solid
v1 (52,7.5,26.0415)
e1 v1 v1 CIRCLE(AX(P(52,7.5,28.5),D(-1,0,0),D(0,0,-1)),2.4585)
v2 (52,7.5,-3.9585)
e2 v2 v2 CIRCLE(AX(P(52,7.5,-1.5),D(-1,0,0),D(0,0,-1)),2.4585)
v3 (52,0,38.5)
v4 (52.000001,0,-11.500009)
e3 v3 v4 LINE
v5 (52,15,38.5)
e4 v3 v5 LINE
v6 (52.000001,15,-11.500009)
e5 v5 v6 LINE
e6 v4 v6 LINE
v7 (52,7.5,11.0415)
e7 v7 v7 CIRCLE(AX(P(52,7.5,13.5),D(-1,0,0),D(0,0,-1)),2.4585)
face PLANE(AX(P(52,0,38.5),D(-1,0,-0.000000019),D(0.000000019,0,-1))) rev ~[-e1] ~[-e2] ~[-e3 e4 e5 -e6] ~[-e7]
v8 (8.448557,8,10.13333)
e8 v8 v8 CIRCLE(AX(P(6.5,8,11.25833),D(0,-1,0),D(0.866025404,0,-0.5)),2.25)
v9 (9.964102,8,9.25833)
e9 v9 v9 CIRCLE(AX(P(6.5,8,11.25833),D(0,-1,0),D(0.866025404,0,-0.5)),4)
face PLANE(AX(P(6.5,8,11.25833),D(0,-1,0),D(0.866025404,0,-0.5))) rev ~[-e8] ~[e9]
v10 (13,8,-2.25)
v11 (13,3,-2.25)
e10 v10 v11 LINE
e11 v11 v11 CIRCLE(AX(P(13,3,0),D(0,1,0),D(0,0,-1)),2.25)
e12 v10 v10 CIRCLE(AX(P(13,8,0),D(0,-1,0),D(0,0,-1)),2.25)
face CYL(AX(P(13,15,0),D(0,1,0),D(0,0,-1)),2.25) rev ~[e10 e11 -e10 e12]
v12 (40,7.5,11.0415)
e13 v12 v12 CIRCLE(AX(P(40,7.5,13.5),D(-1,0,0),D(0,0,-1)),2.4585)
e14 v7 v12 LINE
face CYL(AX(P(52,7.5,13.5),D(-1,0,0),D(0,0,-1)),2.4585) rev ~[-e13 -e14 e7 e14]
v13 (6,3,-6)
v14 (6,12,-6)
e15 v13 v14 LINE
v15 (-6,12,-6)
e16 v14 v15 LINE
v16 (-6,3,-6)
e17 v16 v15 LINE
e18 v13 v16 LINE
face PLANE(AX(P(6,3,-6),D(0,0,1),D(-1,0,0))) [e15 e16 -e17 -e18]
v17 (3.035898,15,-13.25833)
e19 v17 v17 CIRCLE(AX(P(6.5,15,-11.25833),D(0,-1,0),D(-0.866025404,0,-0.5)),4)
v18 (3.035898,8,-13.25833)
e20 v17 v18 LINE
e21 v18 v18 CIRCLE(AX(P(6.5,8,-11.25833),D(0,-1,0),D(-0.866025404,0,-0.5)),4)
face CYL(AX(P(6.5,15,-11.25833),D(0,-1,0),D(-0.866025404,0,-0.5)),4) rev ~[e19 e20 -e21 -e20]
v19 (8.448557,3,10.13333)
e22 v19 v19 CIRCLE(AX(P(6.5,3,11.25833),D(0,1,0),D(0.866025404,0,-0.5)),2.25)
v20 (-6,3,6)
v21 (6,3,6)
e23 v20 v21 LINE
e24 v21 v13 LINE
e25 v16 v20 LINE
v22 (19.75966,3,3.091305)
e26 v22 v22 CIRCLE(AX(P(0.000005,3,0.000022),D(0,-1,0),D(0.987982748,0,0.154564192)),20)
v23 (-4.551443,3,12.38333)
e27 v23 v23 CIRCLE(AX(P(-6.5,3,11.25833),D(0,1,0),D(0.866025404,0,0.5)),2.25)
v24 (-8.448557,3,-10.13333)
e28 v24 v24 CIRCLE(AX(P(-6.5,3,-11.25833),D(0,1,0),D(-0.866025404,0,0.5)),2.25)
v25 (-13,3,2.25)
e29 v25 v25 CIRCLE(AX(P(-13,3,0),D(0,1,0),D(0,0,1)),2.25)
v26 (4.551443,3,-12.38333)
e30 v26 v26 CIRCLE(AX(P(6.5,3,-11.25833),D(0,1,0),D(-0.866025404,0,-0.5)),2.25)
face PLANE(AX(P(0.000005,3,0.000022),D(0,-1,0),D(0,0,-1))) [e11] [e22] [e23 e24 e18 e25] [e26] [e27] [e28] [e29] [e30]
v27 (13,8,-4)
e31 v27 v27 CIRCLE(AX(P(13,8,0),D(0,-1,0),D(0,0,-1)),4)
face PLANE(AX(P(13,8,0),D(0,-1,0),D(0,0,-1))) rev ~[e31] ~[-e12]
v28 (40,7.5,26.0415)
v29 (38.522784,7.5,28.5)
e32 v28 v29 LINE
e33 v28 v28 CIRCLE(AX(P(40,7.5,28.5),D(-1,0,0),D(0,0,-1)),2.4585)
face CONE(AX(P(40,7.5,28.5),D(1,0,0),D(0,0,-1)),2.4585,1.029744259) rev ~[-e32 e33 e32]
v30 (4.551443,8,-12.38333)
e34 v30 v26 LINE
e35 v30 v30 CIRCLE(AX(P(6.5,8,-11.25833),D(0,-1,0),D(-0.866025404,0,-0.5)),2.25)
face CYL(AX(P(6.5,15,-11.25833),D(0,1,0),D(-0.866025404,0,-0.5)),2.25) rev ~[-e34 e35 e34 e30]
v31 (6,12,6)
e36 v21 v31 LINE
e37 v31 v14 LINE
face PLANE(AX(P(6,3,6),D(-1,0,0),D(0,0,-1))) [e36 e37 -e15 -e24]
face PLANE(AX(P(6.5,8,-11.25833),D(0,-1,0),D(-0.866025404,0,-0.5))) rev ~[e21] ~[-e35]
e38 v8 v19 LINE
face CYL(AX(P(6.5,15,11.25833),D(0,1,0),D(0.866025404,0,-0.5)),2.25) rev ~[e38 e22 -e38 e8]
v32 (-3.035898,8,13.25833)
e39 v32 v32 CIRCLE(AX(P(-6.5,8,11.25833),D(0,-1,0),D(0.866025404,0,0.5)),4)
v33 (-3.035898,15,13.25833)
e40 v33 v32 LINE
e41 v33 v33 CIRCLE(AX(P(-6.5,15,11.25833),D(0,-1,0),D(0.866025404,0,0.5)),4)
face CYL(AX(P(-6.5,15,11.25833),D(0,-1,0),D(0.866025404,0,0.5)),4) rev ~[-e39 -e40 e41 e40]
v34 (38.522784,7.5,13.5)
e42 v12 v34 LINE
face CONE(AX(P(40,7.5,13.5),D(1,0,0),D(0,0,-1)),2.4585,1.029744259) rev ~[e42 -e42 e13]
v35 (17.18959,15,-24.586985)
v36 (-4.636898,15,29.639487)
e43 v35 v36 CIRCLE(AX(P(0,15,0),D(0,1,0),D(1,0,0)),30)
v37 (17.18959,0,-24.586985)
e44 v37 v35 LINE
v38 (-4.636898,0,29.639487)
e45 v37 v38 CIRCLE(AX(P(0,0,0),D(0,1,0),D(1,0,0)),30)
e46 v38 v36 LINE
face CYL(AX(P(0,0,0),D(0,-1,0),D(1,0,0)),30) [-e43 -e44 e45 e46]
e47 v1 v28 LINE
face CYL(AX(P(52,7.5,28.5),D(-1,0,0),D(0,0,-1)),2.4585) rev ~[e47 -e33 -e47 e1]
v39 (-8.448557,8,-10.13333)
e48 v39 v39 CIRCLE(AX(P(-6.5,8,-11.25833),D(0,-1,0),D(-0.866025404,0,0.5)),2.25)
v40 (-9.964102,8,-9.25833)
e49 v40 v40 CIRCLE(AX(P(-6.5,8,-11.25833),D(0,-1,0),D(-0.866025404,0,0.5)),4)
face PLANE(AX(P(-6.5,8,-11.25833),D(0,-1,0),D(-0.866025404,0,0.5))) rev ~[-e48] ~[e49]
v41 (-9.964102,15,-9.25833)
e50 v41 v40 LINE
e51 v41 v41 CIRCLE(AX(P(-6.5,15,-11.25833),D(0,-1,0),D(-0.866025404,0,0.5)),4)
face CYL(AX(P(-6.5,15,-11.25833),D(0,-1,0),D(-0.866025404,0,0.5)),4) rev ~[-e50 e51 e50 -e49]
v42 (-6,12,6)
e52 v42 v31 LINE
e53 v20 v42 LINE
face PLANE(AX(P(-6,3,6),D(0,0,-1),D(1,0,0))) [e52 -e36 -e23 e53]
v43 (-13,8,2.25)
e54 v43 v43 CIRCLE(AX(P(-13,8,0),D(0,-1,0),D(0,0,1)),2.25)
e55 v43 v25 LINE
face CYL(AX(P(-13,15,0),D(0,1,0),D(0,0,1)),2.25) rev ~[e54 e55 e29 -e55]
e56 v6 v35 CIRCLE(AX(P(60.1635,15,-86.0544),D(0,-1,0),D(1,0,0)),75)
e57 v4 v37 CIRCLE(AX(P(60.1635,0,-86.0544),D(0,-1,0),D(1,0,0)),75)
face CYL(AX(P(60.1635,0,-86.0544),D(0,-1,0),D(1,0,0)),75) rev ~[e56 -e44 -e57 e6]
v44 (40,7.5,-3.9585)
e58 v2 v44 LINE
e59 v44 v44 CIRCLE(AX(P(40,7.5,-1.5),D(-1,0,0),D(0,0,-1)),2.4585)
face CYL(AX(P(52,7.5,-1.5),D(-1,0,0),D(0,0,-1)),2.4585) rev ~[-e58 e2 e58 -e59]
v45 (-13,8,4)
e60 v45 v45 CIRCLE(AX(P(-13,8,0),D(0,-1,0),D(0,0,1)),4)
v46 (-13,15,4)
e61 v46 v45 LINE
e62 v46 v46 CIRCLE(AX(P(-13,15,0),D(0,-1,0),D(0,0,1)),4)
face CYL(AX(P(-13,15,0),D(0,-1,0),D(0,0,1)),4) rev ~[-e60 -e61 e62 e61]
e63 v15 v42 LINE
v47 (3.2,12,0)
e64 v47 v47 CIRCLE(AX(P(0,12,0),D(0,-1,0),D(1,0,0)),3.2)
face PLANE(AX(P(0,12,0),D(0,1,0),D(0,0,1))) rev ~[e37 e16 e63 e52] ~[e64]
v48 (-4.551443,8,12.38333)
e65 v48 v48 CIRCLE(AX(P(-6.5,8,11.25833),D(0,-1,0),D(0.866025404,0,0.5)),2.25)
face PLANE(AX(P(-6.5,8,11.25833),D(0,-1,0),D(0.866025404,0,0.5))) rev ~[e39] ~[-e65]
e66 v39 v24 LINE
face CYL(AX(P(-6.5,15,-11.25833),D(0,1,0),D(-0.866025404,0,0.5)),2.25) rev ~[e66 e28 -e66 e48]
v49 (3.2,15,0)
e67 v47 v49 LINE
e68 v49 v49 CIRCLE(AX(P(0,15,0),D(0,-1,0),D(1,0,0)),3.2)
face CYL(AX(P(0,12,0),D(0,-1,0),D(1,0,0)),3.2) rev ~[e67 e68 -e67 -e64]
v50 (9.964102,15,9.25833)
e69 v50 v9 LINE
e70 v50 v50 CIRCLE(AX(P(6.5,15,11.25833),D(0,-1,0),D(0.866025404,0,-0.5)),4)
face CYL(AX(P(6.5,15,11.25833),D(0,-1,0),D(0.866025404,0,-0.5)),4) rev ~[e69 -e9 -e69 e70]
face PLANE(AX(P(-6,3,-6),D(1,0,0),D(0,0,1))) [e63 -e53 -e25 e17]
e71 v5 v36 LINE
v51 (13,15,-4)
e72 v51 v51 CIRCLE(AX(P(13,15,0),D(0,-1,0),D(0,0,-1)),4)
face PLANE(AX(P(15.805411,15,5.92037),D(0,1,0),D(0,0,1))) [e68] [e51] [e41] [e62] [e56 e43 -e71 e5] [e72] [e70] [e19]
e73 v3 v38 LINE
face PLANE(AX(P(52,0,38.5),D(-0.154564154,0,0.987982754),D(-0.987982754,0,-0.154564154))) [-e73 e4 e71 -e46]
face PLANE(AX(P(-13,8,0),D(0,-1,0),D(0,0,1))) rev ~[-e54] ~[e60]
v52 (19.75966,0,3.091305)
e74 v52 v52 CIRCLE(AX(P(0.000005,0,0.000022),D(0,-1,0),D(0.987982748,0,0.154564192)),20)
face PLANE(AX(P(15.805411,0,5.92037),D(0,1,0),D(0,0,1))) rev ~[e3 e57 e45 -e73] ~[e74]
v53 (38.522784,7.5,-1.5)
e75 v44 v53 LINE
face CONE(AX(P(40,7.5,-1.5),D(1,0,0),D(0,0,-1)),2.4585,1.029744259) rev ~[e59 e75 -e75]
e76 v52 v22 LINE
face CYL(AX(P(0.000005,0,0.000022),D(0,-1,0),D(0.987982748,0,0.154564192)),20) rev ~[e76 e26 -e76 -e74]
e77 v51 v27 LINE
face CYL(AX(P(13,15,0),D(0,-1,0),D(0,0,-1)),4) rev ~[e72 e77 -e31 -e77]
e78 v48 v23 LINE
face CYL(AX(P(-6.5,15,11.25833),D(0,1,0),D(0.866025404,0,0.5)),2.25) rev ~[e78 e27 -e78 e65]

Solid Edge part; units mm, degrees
sketch "Sketch1" plane through (0, 0, 0) normal (0, -1, 0) x (1, 0, 0)
  line L0 (52, 38.5) -> (52, -11.5)
  line L1 (52, 38.5) -> (-4.6369, 29.6395)
  arc A0 (52, -11.5) -> (17.1896, -24.587) centre (60.1635, -86.0544) ccw
  arc A1 (17.1896, -24.587) -> (-4.6369, 29.6395) centre (0, 0) cw
  dimension "D1" = 52
  dimension "D2" = 60
  dimension "D3" = 50
  dimension "D4" = 38.5
  dimension "D5" = 150
extrude "Protrusion1" add sketch "Sketch1" against normal blind 15
sketch "Sketch2" plane through (11, 0, 4.25) normal (0, -1, 0) x (0.9879828, 0, 0.1545642)
  circle A0 centre (-11.5247, -2.4987) radius 20
  dimension "D1" = 40
extrude "VaciadoExtruido_1" cut sketch "Sketch2" against normal blind 3
sketch "Sketch3" plane through (0, 3, 0) normal (0, -1, 0) x (1, 0, 0)
  line L0 (6, -6) -> (-6, -6)
  line L1 (-6, -6) -> (-6, 6)
  line L2 (-6, 6) -> (6, 6)
  line L3 (6, 6) -> (6, -6)
  dimension "D1" = 12
  dimension "D2" = 12
extrude "VaciadoExtruido_2" cut sketch "Sketch3" against normal blind 9
sketch "Sketch4" plane through (0, 12, 0) normal (0, -1, 0) x (1, 0, 0)
  circle A0 centre (0, 0) radius 3.2
  dimension "D1" = 6.4
extrude "Cutout1" cut sketch "Sketch4" against normal through all
hole "Agujero_1" at (-13, 15, 0) direction (0, -1, 0) diameter 4.5 end up to next counterbore diameter 8 counterbore depth 7
pattern_circular "Pattern1" count 6 over 360 about axis through (0, 15, 0) along (0, 1, 0) of "Agujero_1"
hole "Agujero_7" at (52, 7.5, 28.5) direction (-1, 0, 0) diameter 4.917 depth 12 tip angle 118 thread major 6 thread length 10
hole "Hole6" at (52, 7.5, 13.5) direction (-1, 0, 0) diameter 4.917 depth 12 tip angle 118 thread major 6 thread length 10
hole "Hole7" at (52, 7.5, -1.5) direction (-1, 0, 0) diameter 4.917 depth 12 tip angle 118 thread major 6 thread length 10
properties part number "1976-1400-001" material "Aluminio, 7075-T6"
